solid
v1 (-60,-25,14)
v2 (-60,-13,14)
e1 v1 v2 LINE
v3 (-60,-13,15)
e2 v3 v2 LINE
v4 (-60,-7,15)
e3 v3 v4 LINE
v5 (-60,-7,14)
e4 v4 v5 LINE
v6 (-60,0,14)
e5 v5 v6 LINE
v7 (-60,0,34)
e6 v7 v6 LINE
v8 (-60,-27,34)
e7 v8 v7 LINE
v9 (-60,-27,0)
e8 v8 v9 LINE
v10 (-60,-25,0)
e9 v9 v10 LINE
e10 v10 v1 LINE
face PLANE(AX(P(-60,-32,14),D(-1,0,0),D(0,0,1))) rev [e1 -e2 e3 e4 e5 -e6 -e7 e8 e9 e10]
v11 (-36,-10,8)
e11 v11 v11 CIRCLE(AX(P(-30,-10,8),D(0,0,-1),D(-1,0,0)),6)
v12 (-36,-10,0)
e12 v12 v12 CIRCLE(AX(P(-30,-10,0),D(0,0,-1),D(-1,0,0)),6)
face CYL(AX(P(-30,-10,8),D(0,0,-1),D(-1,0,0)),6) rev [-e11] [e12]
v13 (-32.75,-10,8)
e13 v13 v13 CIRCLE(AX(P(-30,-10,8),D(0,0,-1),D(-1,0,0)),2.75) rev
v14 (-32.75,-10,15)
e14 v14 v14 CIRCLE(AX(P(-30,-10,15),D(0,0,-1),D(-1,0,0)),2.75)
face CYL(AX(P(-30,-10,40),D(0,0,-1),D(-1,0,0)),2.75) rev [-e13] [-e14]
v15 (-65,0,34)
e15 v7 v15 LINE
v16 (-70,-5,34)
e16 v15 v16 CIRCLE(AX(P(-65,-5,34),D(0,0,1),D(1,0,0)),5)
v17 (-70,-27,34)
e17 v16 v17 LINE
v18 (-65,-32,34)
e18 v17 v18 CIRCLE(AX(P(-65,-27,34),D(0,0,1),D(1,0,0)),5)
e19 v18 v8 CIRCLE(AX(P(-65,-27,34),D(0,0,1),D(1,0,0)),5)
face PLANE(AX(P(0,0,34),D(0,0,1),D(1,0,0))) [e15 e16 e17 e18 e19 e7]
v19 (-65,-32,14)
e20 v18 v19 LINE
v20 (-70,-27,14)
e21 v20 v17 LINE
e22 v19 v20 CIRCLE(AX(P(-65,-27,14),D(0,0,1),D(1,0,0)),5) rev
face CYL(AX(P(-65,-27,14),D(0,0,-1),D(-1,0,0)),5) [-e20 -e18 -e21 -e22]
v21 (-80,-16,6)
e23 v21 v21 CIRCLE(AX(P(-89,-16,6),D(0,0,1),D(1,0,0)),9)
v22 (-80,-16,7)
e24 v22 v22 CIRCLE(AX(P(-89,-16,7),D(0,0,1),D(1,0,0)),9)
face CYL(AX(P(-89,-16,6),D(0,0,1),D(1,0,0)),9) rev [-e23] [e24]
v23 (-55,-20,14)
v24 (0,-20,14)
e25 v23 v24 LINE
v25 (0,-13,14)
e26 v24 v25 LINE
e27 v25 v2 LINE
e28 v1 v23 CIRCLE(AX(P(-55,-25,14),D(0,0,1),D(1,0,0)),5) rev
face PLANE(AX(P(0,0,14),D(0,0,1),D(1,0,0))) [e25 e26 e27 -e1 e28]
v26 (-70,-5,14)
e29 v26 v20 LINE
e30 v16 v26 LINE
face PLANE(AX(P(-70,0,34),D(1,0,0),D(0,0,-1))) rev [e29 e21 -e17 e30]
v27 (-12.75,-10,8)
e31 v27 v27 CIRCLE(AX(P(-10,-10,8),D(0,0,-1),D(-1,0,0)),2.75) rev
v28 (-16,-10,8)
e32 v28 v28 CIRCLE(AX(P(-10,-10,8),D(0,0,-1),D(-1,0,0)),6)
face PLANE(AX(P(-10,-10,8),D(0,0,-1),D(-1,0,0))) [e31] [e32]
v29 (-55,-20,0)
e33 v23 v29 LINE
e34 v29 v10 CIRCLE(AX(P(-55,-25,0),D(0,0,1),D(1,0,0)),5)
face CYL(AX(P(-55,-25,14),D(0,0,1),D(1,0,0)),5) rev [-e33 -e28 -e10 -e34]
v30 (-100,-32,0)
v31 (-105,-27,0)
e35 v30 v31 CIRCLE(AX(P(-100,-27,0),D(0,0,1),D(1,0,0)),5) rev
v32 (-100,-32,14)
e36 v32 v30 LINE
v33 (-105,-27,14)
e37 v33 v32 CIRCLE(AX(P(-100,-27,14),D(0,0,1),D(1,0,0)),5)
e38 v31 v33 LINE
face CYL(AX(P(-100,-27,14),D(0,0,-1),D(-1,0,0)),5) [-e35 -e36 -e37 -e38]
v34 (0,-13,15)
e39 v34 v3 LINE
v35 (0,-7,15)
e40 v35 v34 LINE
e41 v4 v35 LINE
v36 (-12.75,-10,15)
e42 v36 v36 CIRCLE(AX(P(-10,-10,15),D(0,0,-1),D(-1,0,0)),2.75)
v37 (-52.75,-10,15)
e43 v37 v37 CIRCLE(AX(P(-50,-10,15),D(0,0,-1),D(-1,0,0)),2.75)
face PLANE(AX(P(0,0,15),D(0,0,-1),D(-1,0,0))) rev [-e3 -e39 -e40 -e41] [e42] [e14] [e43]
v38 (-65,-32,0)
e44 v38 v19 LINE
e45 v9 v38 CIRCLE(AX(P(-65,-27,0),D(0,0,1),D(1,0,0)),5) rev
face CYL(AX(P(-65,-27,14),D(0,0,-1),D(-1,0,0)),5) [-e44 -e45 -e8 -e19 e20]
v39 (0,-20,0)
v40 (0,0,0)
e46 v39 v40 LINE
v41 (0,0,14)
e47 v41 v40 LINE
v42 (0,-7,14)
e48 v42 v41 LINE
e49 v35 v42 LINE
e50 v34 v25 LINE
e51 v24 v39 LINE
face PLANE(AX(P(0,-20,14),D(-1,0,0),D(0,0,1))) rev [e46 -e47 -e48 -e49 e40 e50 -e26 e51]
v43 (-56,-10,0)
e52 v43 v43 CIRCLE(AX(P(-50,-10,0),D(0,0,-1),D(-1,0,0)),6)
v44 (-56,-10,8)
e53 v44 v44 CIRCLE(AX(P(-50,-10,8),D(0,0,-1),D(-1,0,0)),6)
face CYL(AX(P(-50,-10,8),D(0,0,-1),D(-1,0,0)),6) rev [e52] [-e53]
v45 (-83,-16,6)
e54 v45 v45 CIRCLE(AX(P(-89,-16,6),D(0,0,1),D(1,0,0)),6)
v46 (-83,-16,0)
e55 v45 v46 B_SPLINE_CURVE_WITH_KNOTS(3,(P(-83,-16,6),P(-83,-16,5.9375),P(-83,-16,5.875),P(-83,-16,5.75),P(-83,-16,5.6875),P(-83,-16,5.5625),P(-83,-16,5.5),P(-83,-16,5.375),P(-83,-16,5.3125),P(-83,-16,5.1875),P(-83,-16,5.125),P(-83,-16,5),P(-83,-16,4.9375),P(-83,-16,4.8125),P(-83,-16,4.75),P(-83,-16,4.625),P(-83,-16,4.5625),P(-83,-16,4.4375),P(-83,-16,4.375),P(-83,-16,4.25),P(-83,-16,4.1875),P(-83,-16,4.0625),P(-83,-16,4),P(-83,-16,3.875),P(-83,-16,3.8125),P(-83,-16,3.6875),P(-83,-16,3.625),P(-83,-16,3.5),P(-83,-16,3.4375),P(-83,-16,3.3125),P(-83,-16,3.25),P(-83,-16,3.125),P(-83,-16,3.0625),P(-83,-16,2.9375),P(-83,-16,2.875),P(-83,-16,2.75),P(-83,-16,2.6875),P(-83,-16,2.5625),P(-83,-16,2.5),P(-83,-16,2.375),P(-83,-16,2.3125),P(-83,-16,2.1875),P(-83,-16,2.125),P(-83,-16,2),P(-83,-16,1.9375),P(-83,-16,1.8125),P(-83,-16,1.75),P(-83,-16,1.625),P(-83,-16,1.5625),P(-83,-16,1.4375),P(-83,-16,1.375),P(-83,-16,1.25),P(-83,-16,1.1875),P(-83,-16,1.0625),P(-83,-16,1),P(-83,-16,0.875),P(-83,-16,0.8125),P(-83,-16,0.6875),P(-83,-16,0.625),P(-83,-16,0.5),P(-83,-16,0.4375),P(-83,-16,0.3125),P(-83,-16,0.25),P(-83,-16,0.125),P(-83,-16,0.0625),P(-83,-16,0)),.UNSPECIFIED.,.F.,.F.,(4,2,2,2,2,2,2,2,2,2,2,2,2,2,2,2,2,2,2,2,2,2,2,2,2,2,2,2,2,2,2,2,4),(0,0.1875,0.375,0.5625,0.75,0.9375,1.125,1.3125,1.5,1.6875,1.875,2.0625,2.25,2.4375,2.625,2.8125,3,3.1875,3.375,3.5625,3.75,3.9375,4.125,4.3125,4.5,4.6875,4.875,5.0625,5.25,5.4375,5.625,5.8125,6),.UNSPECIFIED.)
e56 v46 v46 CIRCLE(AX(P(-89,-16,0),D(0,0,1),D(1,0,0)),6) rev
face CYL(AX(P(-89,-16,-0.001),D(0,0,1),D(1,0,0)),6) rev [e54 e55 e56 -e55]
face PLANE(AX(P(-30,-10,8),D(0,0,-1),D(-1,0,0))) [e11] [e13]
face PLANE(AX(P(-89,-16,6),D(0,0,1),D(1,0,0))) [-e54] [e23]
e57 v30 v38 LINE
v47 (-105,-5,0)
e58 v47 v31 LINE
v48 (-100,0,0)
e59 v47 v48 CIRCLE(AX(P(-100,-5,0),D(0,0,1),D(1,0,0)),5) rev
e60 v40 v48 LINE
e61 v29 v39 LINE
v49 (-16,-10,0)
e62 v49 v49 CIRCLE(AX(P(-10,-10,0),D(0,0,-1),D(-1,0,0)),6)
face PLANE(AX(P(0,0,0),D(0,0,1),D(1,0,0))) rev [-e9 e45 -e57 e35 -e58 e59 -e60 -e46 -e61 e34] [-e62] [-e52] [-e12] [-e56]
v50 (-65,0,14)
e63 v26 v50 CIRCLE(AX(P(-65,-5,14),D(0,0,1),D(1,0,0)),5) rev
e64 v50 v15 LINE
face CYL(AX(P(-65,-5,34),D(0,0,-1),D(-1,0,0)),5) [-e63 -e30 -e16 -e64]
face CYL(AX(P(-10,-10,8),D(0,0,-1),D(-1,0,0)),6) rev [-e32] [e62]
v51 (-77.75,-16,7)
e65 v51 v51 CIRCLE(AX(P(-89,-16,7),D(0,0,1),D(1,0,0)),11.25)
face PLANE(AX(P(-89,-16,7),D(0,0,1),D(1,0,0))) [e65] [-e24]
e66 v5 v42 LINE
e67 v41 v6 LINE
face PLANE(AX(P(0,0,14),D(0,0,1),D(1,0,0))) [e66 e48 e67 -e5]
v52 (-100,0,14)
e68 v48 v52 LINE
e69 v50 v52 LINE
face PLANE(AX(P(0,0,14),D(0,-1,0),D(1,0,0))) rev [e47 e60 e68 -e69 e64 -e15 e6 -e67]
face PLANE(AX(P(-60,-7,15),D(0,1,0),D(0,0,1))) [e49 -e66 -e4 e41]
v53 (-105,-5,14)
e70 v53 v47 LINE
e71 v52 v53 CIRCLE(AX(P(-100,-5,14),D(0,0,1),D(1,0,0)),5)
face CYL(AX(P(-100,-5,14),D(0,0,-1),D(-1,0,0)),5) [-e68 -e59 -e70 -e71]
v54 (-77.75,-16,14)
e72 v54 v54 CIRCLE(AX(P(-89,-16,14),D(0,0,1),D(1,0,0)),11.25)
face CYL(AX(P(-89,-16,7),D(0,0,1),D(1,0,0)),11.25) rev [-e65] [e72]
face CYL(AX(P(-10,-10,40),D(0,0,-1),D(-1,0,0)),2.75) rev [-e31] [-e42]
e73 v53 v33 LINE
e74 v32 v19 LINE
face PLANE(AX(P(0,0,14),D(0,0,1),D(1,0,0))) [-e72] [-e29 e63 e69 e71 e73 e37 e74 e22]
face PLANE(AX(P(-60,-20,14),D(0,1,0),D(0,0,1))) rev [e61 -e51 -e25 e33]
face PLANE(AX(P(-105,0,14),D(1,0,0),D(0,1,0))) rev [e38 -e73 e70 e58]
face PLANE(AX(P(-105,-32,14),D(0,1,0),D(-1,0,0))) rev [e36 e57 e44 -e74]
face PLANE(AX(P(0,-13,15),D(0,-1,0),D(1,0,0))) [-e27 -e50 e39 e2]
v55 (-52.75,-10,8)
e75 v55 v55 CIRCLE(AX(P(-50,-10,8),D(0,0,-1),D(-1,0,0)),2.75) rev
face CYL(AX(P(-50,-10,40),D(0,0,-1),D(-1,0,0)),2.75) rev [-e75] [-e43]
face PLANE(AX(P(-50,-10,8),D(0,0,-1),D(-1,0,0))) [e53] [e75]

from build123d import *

# Parameters (mm, degrees)
SALIENTE_EXTRUIR1_DEPTH = 14
CROQUIS3_R              = 11.25
CORTAR_EXTRUIR1_DEPTH   = 7
CROQUIS4_R              = 9
CORTAR_EXTRUIR2_DEPTH   = 1
CORTAR_EXTRUIR3_REACH   = 112.059
CROQUIS5_R              = 6
CROQUIS8_W              = 10
CROQUIS8_H              = 32
SALIENTE_EXTRUIR4_DEPTH = 20
REDONDEO1_R             = 5
CROQUIS10_W             = 60
CROQUIS10_H             = 6
SALIENTE_EXTRUIR7_DEPTH = 1
CROQUIS6_R              = 2.75
CORTAR_EXTRUIR6_DEPTH   = 40
CROQUIS11_R             = 6
CORTAR_EXTRUIR7_DEPTH   = 8


with BuildPart() as part:
    # Croquis2 → Saliente-Extruir1 (new body)
    with BuildSketch(Plane.XY):
        Polygon((0, 0), (-105, 0), (-105, -32), (-60, -32), (-60, -20), (0, -20), align=None)
    extrude(amount=SALIENTE_EXTRUIR1_DEPTH)

    # Croquis3 → Cortar-Extruir1 (cut)
    with BuildSketch(Plane.XY.offset(14)):
        with Locations((-89, -16)):
            Circle(CROQUIS3_R)
    extrude(amount=-CORTAR_EXTRUIR1_DEPTH, mode=Mode.SUBTRACT)

    # Croquis4 → Cortar-Extruir2 (cut)
    with BuildSketch(Plane.XY.offset(7)):
        with Locations((-89, -16)):
            Circle(CROQUIS4_R)
    extrude(amount=-CORTAR_EXTRUIR2_DEPTH, mode=Mode.SUBTRACT)

    # Croquis5 → Cortar-Extruir3 (cut, up to next)
    with BuildSketch(Plane.XY.offset(6), mode=Mode.PRIVATE) as cortar_extruir3_sk1:
        with Locations((-89, -16)):
            Circle(CROQUIS5_R)
    cortar_extruir3_tool1 = extrude(cortar_extruir3_sk1.sketch, amount=-CORTAR_EXTRUIR3_REACH, mode=Mode.PRIVATE) & part.part
    add(cortar_extruir3_tool1.solids().sort_by_distance((-89, -16, 6))[0], mode=Mode.SUBTRACT)

    # Croquis8 → Saliente-Extruir4 (add)
    with BuildSketch(Plane.XY.offset(14)):
        with Locations((-65, -16)):
            Rectangle(CROQUIS8_W, CROQUIS8_H)
    extrude(amount=SALIENTE_EXTRUIR4_DEPTH)

    # Redondeo1
    redondeo1_edges = [part.edges().sort_by_distance(p)[0] for p in [
        (-70, 0, 24),
        (-70, -32, 24),
        (-60, -20, 7),
        (-105, -32, 7),
        (-105, 0, 7),
        (-60, -32, 17),
    ]]
    fillet(redondeo1_edges, radius=REDONDEO1_R - 0.0001)  # a hair under: the kernel refuses the full size

    # Croquis10 → Saliente-Extruir7 (add)
    with BuildSketch(Plane.XY.offset(14)):
        with Locations((-30, -10)):
            Rectangle(CROQUIS10_W, CROQUIS10_H)
    extrude(amount=SALIENTE_EXTRUIR7_DEPTH)

    # Croquis6 → Cortar-Extruir6 (cut)
    with BuildSketch(Plane(origin=(0, 0, 0), x_dir=(-1, 0, 0), z_dir=(0, 0, -1))):
        with Locations((10, -10)):
            Circle(CROQUIS6_R)
        with Locations((30, -10)):
            Circle(CROQUIS6_R)
        with Locations((50, -10)):
            Circle(CROQUIS6_R)
    extrude(amount=-CORTAR_EXTRUIR6_DEPTH, mode=Mode.SUBTRACT)

    # Croquis11 → Cortar-Extruir7 (cut)
    with BuildSketch(Plane(origin=(0, 0, 0), x_dir=(-1, 0, 0), z_dir=(0, 0, -1))):
        with Locations((10, -10)):
            Circle(CROQUIS11_R)
        with Locations((30, -10)):
            Circle(CROQUIS11_R)
        with Locations((50, -10)):
            Circle(CROQUIS11_R)
    extrude(amount=-CORTAR_EXTRUIR7_DEPTH, mode=Mode.SUBTRACT)


solid = part.part
